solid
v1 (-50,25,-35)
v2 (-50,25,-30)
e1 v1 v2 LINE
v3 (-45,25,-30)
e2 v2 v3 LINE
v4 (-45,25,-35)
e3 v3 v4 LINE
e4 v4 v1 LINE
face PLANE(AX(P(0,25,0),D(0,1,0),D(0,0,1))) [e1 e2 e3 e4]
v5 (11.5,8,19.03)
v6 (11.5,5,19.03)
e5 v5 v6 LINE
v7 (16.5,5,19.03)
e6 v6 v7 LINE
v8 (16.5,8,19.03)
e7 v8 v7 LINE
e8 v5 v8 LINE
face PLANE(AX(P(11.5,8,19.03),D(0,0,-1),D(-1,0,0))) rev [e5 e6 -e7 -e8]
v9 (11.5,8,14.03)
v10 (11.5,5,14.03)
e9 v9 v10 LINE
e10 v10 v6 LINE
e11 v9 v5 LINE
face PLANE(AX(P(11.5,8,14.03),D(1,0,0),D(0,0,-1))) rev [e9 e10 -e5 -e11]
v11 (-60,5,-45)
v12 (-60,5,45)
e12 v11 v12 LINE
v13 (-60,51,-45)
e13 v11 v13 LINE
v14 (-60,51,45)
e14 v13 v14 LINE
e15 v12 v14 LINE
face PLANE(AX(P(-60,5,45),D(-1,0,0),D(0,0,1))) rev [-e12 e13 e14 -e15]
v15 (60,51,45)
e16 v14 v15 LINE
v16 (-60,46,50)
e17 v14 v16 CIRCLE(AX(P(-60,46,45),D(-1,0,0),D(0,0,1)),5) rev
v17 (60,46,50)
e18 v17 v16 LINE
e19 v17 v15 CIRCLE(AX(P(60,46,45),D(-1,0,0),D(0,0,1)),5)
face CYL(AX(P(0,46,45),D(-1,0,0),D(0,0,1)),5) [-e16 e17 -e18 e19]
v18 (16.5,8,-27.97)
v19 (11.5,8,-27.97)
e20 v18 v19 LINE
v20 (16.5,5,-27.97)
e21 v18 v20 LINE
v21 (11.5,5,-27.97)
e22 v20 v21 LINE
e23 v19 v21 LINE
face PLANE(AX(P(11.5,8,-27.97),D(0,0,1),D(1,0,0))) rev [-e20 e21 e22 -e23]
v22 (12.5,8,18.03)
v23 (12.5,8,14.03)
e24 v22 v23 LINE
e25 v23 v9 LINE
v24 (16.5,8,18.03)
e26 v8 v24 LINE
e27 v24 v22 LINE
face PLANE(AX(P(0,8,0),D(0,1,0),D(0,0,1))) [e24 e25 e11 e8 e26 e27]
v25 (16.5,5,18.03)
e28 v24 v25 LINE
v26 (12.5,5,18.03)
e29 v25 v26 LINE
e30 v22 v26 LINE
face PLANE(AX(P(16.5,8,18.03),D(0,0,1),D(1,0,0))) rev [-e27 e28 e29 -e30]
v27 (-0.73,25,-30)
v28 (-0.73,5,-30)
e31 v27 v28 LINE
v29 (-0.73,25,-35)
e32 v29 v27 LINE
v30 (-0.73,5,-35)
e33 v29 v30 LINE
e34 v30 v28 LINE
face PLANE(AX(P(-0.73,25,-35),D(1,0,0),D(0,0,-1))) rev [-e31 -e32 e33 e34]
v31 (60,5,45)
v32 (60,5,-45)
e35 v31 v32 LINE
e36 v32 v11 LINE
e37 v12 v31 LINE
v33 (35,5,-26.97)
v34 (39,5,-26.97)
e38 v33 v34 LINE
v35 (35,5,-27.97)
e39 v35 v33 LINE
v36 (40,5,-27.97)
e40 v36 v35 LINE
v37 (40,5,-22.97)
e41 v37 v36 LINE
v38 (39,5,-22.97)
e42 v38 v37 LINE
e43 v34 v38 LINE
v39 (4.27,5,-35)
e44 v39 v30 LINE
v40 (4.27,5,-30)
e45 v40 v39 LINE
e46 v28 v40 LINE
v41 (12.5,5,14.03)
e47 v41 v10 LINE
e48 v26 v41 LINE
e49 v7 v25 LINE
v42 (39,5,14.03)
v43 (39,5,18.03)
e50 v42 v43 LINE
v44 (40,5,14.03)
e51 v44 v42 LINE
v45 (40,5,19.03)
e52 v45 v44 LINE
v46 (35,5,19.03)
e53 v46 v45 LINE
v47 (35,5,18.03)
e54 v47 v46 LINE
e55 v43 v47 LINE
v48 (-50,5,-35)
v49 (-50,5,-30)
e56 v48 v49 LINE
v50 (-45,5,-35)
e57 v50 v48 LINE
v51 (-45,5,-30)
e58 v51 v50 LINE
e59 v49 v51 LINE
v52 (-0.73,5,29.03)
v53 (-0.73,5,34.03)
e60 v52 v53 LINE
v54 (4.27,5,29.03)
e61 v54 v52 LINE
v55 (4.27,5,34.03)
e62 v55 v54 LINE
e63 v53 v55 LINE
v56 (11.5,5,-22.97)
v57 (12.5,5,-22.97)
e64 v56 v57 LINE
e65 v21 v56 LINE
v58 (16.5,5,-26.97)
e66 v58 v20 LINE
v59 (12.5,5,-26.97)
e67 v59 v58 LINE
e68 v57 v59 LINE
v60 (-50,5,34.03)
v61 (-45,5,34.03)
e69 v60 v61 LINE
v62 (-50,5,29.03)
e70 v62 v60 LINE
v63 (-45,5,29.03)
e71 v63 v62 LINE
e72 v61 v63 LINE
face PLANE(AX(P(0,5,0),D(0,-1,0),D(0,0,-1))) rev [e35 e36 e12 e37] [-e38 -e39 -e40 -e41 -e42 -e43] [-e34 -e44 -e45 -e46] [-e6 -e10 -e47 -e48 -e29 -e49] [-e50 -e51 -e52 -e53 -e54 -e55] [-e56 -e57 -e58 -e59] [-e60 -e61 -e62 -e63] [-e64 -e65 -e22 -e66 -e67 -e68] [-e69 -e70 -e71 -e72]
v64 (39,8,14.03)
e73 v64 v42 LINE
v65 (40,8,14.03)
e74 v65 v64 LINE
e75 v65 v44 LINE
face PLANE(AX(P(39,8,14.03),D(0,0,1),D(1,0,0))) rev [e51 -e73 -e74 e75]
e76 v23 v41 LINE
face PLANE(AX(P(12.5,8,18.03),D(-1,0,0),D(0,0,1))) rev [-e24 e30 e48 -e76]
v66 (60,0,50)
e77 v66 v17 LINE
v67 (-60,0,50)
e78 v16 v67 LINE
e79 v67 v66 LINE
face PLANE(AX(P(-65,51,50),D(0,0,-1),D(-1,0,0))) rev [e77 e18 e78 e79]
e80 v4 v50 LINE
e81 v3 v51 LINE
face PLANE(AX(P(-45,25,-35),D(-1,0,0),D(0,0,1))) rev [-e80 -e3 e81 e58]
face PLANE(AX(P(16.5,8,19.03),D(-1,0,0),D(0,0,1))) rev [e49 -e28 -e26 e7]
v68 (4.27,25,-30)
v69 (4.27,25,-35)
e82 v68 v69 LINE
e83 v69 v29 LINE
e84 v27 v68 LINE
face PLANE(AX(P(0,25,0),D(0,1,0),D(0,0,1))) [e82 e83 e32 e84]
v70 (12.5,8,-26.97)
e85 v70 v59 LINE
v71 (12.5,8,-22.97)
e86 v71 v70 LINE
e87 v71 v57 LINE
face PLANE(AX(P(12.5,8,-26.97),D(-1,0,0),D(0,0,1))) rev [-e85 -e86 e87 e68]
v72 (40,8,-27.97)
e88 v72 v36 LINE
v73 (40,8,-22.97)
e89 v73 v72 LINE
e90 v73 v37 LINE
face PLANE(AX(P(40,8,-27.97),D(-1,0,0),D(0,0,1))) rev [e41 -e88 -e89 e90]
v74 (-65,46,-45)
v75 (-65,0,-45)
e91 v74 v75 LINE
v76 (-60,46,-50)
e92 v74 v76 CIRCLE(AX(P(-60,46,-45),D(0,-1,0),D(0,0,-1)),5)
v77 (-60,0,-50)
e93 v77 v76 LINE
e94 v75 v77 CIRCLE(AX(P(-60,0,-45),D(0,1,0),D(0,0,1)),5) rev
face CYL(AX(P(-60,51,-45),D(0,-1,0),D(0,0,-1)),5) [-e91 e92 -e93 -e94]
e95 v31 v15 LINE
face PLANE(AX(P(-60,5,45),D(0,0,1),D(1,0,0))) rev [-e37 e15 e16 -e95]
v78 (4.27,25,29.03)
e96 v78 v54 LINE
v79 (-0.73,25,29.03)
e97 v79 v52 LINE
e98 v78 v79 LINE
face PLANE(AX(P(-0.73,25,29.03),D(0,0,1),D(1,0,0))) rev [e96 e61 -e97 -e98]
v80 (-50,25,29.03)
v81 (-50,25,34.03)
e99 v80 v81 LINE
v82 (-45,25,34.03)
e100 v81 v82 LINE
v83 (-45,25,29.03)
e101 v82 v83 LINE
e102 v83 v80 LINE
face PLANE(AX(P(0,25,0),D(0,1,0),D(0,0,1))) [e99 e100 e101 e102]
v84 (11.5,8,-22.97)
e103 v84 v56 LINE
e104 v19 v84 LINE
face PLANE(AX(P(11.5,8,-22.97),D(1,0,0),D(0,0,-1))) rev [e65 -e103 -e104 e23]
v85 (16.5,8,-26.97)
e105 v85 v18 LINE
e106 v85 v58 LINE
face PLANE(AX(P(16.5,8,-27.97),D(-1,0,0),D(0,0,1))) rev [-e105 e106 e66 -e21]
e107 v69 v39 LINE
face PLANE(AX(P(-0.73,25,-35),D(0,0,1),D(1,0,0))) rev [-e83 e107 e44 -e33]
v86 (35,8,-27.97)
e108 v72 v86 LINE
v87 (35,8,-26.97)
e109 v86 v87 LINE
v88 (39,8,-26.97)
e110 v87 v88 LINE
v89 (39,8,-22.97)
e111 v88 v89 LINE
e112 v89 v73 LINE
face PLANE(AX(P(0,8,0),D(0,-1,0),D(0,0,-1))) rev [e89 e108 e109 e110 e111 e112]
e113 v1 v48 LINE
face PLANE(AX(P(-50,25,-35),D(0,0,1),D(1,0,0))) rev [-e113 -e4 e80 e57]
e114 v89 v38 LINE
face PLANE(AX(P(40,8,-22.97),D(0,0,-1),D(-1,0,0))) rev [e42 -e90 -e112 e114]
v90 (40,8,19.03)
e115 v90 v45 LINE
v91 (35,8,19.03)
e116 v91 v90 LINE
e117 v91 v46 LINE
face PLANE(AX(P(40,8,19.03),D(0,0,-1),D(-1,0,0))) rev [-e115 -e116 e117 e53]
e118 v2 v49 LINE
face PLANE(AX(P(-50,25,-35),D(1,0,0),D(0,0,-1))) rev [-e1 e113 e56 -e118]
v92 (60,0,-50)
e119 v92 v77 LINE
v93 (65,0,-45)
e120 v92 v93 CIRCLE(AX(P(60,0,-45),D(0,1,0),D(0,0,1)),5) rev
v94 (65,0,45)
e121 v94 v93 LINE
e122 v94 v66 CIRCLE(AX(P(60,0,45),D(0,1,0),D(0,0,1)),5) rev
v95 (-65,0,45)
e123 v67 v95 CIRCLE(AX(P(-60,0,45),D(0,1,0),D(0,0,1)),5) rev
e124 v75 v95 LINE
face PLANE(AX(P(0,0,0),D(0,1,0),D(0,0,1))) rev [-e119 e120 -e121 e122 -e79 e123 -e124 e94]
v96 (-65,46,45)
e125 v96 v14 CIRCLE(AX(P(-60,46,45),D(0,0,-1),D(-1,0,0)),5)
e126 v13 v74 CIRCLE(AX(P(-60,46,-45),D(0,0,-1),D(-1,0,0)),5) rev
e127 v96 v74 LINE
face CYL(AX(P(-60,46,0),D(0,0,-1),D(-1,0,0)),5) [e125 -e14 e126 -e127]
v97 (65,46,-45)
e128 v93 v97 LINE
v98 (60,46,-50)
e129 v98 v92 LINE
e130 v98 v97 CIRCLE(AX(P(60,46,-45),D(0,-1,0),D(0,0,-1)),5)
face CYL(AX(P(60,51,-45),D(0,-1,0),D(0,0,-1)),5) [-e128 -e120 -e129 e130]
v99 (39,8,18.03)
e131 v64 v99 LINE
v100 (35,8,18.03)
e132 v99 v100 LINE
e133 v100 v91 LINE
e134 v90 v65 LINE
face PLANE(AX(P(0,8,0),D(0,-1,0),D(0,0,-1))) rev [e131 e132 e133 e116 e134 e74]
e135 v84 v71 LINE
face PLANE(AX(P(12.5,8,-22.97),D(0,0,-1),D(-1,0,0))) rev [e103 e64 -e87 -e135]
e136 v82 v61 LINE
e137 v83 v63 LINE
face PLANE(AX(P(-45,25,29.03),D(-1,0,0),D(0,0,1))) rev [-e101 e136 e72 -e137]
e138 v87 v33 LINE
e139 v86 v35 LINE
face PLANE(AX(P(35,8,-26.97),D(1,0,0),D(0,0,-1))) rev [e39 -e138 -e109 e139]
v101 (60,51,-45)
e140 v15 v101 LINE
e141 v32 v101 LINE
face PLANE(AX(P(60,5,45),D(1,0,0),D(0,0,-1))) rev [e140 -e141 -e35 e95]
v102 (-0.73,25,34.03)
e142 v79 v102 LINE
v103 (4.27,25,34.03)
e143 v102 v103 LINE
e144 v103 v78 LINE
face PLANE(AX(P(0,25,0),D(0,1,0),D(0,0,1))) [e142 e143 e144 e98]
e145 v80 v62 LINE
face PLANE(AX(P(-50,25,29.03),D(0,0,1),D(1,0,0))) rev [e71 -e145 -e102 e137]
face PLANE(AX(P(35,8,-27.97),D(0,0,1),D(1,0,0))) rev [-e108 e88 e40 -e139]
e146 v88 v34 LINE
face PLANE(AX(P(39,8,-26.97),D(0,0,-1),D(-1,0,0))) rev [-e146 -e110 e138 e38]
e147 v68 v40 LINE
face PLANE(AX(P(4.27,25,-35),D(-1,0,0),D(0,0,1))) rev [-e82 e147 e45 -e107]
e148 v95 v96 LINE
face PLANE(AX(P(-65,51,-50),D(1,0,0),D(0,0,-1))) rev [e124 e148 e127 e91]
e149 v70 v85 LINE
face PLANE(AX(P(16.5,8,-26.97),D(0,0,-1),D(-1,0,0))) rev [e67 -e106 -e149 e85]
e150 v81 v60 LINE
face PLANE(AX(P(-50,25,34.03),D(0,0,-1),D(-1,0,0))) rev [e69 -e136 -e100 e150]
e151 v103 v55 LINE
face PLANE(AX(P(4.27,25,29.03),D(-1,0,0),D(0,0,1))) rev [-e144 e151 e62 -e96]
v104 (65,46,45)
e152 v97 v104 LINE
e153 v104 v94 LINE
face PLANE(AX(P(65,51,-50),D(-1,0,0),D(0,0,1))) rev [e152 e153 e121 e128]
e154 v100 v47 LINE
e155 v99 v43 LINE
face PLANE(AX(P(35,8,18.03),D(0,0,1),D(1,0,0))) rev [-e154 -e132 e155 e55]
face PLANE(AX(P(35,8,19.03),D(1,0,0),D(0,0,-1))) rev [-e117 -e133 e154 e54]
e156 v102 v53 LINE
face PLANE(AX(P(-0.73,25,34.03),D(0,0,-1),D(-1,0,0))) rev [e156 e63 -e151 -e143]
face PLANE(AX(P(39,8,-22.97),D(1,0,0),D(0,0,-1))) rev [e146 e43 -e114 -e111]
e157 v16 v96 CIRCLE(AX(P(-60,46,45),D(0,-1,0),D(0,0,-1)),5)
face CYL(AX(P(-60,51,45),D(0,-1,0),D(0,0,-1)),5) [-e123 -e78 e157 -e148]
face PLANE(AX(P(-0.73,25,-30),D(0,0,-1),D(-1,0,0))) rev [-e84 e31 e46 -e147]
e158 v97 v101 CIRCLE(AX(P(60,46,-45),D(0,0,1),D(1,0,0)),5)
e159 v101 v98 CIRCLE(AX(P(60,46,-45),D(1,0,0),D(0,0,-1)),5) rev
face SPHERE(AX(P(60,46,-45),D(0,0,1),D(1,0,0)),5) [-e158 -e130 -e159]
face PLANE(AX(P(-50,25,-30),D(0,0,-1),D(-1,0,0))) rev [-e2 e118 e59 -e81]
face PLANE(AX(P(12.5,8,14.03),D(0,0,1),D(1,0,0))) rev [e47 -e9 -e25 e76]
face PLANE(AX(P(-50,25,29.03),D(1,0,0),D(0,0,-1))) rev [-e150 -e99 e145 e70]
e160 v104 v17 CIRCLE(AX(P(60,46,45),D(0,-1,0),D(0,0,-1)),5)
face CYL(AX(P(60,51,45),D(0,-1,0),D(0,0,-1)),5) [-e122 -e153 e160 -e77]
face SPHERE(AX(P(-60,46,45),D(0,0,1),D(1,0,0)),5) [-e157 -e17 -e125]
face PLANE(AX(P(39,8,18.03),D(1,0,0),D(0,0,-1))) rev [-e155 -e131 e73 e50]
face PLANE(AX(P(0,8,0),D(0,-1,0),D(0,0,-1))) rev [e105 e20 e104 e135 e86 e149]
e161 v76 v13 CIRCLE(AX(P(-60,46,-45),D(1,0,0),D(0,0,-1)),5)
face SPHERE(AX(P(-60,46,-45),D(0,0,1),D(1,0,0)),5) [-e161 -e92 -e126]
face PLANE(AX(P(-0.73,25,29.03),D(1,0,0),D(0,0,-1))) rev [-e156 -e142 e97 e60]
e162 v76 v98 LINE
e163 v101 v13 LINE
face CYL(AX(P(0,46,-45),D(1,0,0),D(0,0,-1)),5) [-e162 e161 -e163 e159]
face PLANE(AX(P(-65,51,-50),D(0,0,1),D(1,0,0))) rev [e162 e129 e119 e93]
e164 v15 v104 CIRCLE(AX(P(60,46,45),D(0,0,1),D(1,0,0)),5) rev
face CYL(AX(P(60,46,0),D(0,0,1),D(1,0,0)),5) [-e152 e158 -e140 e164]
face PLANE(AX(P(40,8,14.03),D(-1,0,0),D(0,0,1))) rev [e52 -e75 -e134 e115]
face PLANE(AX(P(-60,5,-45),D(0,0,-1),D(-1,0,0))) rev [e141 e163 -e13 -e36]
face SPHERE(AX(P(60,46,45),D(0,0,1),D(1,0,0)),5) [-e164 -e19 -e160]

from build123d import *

# Parameters (mm, degrees)
SKETCH1_W           = 130
SKETCH1_H           = 100
BOSS_EXTRUDE1_DEPTH = 51
SKETCH2_W           = 120
SKETCH2_H           = 90
CUT_EXTRUDE1_DEPTH  = 46
FILLET2_R           = 5
FILLET4_R           = 5
SKETCH6_W           = 5
SKETCH6_H           = 5
BOSS_EXTRUDE2_DEPTH = 20
BOSS_EXTRUDE3_DEPTH = 3


# Some blends are built 0.0001 mm under size
with BuildPart() as part:
    # Sketch1 → Boss-Extrude1 (new body)
    with BuildSketch(Plane(origin=(0, 0, 0), x_dir=(1, 0, 0), z_dir=(0, 1, 0))):
        Rectangle(SKETCH1_W, SKETCH1_H)
    extrude(amount=BOSS_EXTRUDE1_DEPTH)

    # Sketch2 → Cut-Extrude1 (cut)
    with BuildSketch(Plane(origin=(0, 51, 0), x_dir=(1, 0, 0), z_dir=(0, 1, 0))):
        Rectangle(SKETCH2_W, SKETCH2_H)
    extrude(amount=-CUT_EXTRUDE1_DEPTH, mode=Mode.SUBTRACT)

    # Fillet2
    fillet2_edges = [part.edges().sort_by_distance(p)[0] for p in [
        (-65, 51, 0),
        (0, 51, 50),
        (65, 51, 0),
        (0, 51, -50),
    ]]
    fillet(fillet2_edges, radius=FILLET2_R - 0.0001)  # a hair under: the kernel refuses the full size

    # Fillet4
    # the kernel refuses this fillet: 5 mm, written as the material it takes off along each edge
    with BuildSketch(Plane(origin=(60, 51, 45), x_dir=(0, 0, 1), z_dir=(-1, 0, 0))) as fillet4_piece_1:
        with BuildLine():
            CenterArc((0.0001, -4.9999), 4.9999, 0, 90)
            Line((5, -4.9999), (5, 0))
            Line((5, 0), (0.0001, 0))
        make_face()
    revolve(axis=Axis((60, 51, 45), (0, 1, 0)), revolution_arc=90, mode=Mode.SUBTRACT)
    with BuildSketch(Plane(origin=(-60, 51, 45), x_dir=(-1, 0, 0), z_dir=(0, 0, -1))) as fillet4_piece_2:
        with BuildLine():
            CenterArc((0.0001, -4.9999), 4.9999, 0, 90)
            Line((5, -4.9999), (5, 0))
            Line((5, 0), (0.0001, 0))
        make_face()
    revolve(axis=Axis((-60, 51, 45), (0, 1, 0)), revolution_arc=90, mode=Mode.SUBTRACT)
    with BuildSketch(Plane(origin=(60, 51, -45), x_dir=(1, 0, 0), z_dir=(0, 0, 1))) as fillet4_piece_3:
        with BuildLine():
            CenterArc((0.0001, -4.9999), 4.9999, 0, 90)
            Line((5, -4.9999), (5, 0))
            Line((5, 0), (0.0001, 0))
        make_face()
    revolve(axis=Axis((60, 51, -45), (0, 1, 0)), revolution_arc=90, mode=Mode.SUBTRACT)
    with BuildSketch(Plane(origin=(-60, 51, -45), x_dir=(0, 0, -1), z_dir=(1, 0, 0))) as fillet4_piece_4:
        with BuildLine():
            CenterArc((0.0001, -4.9999), 4.9999, 0, 90)
            Line((5, -4.9999), (5, 0))
            Line((5, 0), (0.0001, 0))
        make_face()
    revolve(axis=Axis((-60, 51, -45), (0, 1, 0)), revolution_arc=90, mode=Mode.SUBTRACT)
    with BuildSketch(Plane(origin=(-65, -12.5, -50), x_dir=(1, 0, 0), z_dir=(0, 1, 0)), Plane(origin=(-65, -12.5, 50), x_dir=(0, 0, -1), z_dir=(0, 1, 0))) as fillet4_piece_5:
        with BuildLine():
            CenterArc((FILLET4_R, -FILLET4_R), FILLET4_R, 90, 90)
            Line((0, -FILLET4_R), (0, 0))
            Line((0, 0), (FILLET4_R, 0))
        make_face()
    extrude(amount=63.5, mode=Mode.SUBTRACT)
    with BuildSketch(Plane(origin=(65, -12.5, -50), x_dir=(-1, 0, 0), z_dir=(0, 1, 0)), Plane(origin=(65, -12.5, 50), x_dir=(0, 0, -1), z_dir=(0, 1, 0))) as fillet4_piece_6:
        with BuildLine():
            CenterArc((FILLET4_R, FILLET4_R), FILLET4_R, 180, 90)
            Line((0, FILLET4_R), (0, 0))
            Line((0, 0), (FILLET4_R, 0))
        make_face()
    extrude(amount=63.5, mode=Mode.SUBTRACT)

    # Sketch6 → Boss-Extrude2 (add)
    with BuildSketch(Plane(origin=(0, 5, 0), x_dir=(1, 0, 0), z_dir=(0, 1, 0))):
        with Locations((-47.5, 32.5)):
            Rectangle(SKETCH6_W, SKETCH6_H)
        with Locations((-47.5, -31.53)):
            Rectangle(SKETCH6_W, SKETCH6_H)
        with Locations((1.77, 32.5)):
            Rectangle(SKETCH6_W, SKETCH6_H)
        with Locations((1.77, -31.53)):
            Rectangle(SKETCH6_W, SKETCH6_H)
    extrude(amount=BOSS_EXTRUDE2_DEPTH)

    # Sketch9 → Boss-Extrude3 (add)
    with BuildSketch(Plane(origin=(0, 5, 0), x_dir=(1, 0, 0), z_dir=(0, 1, 0))):
        Polygon((11.5, -14.03), (11.5, -19.03), (16.5, -19.03), (16.5, -18.03), (12.5, -18.03), (12.5, -14.03), align=None)
        Polygon((11.5, 27.97), (16.5, 27.97), (16.5, 26.97), (12.5, 26.97), (12.5, 22.97), (11.5, 22.97), align=None)
        Polygon((40, 27.97), (40, 22.97), (39, 22.97), (39, 26.97), (35, 26.97), (35, 27.97), align=None)
        Polygon((40, -19.03), (35, -19.03), (35, -18.03), (39, -18.03), (39, -14.03), (40, -14.03), align=None)
    extrude(amount=BOSS_EXTRUDE3_DEPTH)


solid = part.part
